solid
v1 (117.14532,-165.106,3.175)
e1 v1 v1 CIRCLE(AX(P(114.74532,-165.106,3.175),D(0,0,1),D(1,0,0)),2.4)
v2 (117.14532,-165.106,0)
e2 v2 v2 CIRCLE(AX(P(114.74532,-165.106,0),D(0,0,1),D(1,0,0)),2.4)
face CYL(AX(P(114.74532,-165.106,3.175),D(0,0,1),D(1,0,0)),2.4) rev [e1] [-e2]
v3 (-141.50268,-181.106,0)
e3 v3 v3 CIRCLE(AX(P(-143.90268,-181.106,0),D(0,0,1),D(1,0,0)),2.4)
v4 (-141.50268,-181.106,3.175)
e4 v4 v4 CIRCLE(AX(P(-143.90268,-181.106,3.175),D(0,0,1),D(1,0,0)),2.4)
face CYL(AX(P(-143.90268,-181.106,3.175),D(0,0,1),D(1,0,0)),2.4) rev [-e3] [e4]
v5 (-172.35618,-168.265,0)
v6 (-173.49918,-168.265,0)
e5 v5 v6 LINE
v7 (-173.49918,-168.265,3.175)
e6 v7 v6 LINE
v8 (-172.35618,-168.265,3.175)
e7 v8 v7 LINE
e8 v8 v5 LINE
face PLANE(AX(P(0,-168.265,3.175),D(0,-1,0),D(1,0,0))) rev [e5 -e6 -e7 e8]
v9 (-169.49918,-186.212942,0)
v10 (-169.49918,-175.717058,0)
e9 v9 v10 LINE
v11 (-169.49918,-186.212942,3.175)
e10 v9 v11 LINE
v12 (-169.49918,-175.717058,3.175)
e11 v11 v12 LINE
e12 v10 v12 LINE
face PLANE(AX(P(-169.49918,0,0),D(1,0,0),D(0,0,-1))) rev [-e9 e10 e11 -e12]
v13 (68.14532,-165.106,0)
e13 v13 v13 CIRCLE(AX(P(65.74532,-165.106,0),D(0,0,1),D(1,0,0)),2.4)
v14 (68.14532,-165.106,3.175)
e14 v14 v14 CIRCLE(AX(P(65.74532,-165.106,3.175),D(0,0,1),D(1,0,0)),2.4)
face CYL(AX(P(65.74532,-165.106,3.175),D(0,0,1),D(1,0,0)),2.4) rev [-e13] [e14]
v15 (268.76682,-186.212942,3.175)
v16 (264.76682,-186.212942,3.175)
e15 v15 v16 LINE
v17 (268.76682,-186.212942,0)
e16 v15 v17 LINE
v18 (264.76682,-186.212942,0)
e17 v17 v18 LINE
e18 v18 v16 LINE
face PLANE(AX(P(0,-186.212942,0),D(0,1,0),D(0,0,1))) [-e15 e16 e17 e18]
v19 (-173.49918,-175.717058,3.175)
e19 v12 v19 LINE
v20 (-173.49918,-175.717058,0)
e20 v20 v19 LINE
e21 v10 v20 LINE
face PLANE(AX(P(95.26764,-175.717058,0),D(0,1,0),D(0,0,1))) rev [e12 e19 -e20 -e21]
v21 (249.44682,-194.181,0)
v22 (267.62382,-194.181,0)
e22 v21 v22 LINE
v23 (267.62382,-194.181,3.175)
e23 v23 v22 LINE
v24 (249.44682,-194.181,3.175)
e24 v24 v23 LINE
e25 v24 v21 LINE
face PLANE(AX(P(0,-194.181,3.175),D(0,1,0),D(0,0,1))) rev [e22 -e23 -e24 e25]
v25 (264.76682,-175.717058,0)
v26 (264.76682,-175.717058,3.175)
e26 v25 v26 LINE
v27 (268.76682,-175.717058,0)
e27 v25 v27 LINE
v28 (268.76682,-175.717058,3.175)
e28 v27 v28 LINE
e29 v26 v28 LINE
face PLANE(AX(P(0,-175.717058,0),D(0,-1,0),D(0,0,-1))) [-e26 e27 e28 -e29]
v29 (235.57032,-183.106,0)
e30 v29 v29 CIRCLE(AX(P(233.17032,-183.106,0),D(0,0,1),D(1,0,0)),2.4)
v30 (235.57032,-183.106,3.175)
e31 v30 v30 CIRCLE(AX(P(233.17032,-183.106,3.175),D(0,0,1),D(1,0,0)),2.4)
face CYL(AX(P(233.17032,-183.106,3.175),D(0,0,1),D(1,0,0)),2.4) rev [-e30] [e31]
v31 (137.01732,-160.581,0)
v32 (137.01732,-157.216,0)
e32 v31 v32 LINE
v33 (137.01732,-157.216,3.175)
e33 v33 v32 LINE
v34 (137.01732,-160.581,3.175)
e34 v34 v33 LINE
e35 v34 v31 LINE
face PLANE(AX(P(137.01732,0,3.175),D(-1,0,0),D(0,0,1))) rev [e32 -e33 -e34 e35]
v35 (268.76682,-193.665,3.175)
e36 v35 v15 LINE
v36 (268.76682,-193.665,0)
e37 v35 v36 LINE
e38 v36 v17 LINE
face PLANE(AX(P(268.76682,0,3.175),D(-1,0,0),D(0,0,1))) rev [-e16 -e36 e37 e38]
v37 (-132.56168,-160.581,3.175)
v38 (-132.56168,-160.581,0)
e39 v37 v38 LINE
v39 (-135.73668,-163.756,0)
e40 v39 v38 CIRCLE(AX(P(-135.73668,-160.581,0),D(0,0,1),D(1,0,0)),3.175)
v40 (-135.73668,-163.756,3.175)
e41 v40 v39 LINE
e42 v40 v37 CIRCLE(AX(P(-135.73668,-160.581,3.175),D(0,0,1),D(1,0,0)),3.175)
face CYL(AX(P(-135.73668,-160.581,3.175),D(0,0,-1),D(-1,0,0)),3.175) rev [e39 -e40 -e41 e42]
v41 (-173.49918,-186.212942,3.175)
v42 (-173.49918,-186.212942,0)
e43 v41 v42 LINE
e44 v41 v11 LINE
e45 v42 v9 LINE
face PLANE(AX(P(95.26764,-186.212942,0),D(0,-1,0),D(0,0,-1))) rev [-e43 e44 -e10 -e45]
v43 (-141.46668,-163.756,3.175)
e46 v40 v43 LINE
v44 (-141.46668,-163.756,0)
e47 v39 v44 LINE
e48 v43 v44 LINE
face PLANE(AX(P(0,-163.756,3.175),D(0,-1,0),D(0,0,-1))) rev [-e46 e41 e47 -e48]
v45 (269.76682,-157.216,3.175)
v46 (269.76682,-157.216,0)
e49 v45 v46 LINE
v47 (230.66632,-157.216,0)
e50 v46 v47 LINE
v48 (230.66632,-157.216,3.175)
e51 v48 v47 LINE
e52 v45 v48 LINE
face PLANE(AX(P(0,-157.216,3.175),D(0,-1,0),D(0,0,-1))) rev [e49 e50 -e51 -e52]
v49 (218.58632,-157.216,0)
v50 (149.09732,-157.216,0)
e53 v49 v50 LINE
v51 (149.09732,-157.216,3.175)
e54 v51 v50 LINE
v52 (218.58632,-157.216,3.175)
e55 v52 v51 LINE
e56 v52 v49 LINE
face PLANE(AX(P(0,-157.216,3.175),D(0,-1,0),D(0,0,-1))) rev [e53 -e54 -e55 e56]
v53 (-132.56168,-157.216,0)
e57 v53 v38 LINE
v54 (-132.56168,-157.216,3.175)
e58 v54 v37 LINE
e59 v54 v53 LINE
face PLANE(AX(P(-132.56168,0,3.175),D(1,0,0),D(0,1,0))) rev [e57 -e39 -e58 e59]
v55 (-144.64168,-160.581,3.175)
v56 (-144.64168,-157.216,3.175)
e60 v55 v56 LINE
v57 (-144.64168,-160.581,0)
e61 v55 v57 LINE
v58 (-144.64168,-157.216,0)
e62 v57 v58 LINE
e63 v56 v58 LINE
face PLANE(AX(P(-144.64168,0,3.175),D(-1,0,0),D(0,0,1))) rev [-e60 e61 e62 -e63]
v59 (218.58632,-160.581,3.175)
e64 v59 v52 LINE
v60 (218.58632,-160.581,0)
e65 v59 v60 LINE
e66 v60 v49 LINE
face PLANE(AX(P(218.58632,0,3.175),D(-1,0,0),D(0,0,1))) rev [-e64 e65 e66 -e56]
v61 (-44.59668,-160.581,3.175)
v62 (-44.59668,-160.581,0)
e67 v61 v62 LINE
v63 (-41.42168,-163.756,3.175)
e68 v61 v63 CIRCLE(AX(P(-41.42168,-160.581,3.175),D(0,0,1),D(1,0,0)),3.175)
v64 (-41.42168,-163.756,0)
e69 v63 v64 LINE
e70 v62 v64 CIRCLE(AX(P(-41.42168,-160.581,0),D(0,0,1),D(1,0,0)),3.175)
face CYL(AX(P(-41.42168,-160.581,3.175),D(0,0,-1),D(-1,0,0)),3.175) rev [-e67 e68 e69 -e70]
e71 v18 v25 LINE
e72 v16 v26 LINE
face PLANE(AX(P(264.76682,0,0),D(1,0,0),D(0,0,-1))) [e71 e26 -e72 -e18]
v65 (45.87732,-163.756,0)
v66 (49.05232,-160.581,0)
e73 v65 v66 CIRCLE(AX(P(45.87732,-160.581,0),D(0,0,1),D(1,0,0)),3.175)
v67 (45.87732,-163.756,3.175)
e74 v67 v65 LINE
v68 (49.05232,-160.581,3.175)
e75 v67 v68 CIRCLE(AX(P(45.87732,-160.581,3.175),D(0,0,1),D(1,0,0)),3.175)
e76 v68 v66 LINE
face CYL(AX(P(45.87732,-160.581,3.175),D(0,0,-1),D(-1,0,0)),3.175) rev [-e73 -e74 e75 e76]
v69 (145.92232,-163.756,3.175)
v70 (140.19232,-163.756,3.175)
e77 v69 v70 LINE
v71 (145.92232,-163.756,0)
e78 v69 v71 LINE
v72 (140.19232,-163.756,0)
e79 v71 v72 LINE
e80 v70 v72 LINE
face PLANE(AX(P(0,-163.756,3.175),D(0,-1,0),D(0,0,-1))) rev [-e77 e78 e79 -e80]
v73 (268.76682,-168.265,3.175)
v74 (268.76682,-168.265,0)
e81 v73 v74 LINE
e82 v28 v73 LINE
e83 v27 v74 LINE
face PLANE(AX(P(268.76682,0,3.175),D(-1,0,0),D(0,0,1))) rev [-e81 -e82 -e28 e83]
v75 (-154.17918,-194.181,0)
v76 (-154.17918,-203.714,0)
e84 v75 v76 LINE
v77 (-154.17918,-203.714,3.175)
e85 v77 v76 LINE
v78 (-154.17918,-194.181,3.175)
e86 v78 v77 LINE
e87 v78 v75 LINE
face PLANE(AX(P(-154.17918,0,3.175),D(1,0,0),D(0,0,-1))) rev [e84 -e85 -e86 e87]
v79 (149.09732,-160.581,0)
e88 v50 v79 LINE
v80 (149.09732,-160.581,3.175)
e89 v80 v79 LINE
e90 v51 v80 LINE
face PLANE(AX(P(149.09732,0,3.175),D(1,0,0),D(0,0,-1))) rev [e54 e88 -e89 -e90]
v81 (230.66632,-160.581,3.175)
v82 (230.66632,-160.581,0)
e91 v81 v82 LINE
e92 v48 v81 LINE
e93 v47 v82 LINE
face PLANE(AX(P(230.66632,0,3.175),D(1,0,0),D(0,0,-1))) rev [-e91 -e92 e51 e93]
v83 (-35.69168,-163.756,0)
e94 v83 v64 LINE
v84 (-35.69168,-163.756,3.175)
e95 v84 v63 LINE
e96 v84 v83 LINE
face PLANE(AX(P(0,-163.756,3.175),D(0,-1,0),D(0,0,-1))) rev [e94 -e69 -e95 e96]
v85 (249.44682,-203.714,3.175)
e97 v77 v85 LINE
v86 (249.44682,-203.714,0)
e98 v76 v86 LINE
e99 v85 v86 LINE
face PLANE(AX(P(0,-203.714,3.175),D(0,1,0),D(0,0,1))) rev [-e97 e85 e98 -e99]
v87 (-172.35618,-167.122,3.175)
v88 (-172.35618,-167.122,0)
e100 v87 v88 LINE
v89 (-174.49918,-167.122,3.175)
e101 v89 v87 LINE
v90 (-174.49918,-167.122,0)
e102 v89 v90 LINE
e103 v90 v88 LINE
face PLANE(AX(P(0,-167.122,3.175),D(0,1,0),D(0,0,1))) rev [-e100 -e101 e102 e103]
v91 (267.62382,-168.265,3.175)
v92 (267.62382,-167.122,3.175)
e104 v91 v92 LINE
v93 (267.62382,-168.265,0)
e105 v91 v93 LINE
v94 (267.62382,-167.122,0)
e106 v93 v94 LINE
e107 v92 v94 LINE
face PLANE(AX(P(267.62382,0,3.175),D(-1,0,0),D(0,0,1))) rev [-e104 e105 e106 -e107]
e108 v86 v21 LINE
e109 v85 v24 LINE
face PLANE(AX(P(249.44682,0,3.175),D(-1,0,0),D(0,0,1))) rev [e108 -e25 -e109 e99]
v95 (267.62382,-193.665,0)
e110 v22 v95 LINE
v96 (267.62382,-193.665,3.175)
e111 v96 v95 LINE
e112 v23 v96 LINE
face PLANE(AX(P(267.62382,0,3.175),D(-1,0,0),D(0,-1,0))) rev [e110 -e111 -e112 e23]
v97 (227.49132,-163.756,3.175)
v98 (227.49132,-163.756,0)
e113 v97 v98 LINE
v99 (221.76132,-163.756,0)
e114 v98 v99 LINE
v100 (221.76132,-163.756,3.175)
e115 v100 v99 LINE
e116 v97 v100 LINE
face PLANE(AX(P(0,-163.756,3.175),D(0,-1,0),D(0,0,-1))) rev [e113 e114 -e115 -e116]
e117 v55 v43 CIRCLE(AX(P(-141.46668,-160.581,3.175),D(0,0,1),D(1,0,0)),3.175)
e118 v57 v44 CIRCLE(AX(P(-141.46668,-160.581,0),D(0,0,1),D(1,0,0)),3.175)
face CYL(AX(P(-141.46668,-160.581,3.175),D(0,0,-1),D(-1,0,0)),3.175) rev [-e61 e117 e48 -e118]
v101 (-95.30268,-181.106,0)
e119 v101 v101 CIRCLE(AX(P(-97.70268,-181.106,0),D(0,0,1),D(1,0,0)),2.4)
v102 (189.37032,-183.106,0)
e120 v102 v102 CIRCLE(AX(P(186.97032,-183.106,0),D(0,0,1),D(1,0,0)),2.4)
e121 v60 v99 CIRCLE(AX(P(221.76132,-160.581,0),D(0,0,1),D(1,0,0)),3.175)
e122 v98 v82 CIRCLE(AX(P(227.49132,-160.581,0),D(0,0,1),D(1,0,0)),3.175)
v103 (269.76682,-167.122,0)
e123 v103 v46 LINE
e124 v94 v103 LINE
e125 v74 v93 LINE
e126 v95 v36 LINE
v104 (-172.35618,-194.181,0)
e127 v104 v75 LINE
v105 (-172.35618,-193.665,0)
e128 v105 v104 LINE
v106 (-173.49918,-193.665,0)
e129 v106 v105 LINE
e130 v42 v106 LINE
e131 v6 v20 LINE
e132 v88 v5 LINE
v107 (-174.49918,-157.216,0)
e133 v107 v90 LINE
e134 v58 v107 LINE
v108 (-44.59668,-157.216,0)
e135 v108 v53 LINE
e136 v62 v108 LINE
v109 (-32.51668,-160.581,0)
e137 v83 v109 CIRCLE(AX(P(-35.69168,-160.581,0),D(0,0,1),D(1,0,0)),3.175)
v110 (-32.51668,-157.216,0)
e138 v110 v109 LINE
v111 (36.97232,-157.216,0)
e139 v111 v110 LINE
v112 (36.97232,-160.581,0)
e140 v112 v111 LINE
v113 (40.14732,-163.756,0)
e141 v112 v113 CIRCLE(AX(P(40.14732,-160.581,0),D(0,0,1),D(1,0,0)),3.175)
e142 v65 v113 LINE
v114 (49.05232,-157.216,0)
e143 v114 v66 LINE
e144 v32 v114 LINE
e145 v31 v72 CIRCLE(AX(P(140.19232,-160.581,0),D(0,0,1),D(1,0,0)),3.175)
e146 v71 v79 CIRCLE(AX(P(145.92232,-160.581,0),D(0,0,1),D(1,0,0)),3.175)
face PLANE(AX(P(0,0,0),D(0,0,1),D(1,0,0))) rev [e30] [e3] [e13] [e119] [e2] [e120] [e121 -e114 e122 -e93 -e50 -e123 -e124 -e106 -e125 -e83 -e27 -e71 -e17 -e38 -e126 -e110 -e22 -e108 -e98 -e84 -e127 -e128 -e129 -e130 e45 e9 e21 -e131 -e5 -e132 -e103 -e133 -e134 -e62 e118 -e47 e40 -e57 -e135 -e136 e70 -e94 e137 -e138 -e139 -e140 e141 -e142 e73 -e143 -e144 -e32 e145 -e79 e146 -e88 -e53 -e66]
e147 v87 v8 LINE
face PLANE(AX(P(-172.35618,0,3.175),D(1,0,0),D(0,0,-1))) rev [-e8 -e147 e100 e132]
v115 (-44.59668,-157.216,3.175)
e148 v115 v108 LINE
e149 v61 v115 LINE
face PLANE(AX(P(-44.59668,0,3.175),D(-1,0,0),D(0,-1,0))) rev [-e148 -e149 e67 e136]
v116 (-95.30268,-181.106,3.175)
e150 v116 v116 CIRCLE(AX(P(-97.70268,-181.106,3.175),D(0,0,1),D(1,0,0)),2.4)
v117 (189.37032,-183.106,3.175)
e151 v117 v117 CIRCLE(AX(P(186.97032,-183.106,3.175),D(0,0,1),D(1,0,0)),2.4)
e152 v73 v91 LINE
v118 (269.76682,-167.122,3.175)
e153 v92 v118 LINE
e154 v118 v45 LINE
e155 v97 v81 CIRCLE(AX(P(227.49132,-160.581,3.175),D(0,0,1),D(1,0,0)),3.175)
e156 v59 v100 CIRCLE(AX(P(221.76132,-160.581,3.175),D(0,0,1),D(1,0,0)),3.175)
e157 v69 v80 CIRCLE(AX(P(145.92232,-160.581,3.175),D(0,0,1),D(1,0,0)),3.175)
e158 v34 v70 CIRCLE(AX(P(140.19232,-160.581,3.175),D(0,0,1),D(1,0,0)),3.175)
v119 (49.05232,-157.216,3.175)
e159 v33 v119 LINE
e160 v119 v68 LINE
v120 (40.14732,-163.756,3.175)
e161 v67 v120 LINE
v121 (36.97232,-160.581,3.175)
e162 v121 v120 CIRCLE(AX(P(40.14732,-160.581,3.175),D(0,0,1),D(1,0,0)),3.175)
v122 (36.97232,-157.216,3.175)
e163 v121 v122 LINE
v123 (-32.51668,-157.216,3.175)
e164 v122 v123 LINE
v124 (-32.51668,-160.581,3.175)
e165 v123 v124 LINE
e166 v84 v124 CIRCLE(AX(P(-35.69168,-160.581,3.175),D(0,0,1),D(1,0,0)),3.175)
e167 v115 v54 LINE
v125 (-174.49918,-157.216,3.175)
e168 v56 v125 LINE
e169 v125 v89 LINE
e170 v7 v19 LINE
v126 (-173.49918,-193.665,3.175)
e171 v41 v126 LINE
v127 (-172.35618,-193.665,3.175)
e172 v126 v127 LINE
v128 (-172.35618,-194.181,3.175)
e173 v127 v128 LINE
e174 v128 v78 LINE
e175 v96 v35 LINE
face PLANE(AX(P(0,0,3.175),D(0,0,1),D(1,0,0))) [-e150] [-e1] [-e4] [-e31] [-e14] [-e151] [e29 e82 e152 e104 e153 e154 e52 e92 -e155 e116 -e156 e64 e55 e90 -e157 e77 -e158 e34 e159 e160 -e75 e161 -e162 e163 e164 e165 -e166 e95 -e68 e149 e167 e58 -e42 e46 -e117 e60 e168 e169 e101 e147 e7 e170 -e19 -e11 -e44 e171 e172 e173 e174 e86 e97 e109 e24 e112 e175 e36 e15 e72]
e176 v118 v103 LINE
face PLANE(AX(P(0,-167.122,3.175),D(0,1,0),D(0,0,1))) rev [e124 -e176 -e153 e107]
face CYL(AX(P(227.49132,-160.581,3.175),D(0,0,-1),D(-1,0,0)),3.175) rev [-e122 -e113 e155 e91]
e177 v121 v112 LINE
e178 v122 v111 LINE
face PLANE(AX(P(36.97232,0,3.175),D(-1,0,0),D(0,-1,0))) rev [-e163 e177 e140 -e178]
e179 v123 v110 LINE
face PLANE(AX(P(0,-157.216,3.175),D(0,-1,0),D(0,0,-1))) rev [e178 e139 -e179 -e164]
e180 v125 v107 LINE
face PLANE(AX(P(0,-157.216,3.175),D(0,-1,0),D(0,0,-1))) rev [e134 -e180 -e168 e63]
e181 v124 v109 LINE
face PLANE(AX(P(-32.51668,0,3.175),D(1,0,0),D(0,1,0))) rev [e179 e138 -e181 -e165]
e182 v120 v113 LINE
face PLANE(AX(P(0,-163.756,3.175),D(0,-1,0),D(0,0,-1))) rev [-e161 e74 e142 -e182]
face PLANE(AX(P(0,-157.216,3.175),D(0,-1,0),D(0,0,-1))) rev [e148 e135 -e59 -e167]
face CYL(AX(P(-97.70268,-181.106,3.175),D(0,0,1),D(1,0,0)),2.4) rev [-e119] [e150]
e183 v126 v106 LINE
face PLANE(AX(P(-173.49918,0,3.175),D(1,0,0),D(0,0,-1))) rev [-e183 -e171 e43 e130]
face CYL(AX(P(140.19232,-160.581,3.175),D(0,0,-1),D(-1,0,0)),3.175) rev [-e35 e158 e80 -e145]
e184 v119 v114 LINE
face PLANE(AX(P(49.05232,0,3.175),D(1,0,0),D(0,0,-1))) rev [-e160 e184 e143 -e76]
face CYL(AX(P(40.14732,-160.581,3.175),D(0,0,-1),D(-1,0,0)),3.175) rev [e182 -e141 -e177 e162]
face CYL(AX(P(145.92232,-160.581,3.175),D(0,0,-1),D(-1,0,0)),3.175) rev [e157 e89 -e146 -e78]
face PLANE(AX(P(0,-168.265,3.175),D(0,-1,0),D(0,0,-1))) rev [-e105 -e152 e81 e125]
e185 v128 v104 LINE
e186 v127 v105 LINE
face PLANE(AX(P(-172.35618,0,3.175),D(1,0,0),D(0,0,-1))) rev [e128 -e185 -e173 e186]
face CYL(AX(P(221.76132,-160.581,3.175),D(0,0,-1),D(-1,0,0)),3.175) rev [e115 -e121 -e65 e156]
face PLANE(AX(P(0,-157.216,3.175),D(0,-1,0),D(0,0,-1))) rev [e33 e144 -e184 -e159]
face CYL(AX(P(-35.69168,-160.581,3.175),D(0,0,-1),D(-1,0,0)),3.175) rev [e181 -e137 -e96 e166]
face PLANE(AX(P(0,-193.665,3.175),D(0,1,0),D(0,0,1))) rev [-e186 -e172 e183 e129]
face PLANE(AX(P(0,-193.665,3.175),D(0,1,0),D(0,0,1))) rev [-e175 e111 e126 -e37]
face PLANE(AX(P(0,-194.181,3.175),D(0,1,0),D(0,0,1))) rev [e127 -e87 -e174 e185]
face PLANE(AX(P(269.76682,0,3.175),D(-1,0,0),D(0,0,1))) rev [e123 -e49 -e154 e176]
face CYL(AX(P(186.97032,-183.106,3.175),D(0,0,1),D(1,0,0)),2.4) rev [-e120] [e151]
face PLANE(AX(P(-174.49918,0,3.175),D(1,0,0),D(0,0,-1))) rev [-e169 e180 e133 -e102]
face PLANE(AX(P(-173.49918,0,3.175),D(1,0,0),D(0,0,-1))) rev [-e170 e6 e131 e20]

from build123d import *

# Parameters (mm, degrees)
BOSS_EXTRUDE1_DEPTH          = 3.175
M4_CLEARANCE_HOLE1_OUTLINE_R = 2.4
M4_CLEARANCE_HOLE1_DEPTH     = 3.175
CUT_EXTRUDE1_DEPTH           = 3.175


# Read off the part's stored shape, not the designer's step: M4 Clearance Hole1
with BuildPart() as part:
    # Sketch2 → Boss-Extrude1 (new body)
    with BuildSketch(Plane.XY):
        with BuildLine():
            Line((227.491320086, -163.756000107), (221.761320086, -163.756000107))
            ThreePointArc((221.761320086, -163.756000107), (219.516256056, -162.826064137), (218.586320086, -160.581000107))
            Line((218.586320086, -160.581000107), (218.586320086, -157.216000107))
            Line((218.586320086, -157.216000107), (149.097320094, -157.216000107))
            Line((149.097320094, -157.216000107), (149.097320094, -160.581000107))
            ThreePointArc((149.097320094, -160.581000107), (148.167384125, -162.826064137), (145.922320094, -163.756000107))
            Line((145.922320094, -163.756000107), (140.192320094, -163.756000107))
            ThreePointArc((140.192320094, -163.756000107), (137.947256064, -162.826064137), (137.017320094, -160.581000107))
            Line((137.017320094, -160.581000107), (137.017320094, -157.216000107))
            Line((137.017320094, -157.216000107), (49.052320094, -157.216000107))
            Line((49.052320094, -157.216000107), (49.052320094, -160.581000107))
            ThreePointArc((49.052320094, -160.581000107), (48.122384125, -162.826064137), (45.877320094, -163.756000107))
            Line((45.877320094, -163.756000107), (40.147320094, -163.756000107))
            ThreePointArc((40.147320094, -163.756000107), (37.902256064, -162.826064137), (36.972320094, -160.581000107))
            Line((36.972320094, -160.581000107), (36.972320094, -157.216000107))
            Line((36.972320094, -157.216000107), (-32.516679898, -157.216000107))
            Line((-32.516679898, -157.216000107), (-32.516679898, -160.581000107))
            ThreePointArc((-32.516679898, -160.581000107), (-33.446615867, -162.826064137), (-35.691679898, -163.756000107))
            Line((-35.691679898, -163.756000107), (-41.421679898, -163.756000107))
            ThreePointArc((-41.421679898, -163.756000107), (-43.666743928, -162.826064137), (-44.596679898, -160.581000107))
            Line((-44.596679898, -160.581000107), (-44.596679898, -157.216000107))
            Line((-44.596679898, -157.216000107), (-132.561679898, -157.216000107))
            Line((-132.561679898, -157.216000107), (-132.561679898, -160.581000107))
            ThreePointArc((-132.561679898, -160.581000107), (-133.491615867, -162.826064137), (-135.736679898, -163.756000107))
            Line((-135.736679898, -163.756000107), (-141.466679898, -163.756000107))
            ThreePointArc((-141.466679898, -163.756000107), (-143.711743928, -162.826064137), (-144.641679898, -160.581000107))
            Line((-144.641679898, -160.581000107), (-144.641679898, -157.216000107))
            Line((-144.641679898, -157.216000107), (-174.499179878, -157.216000107))
            Line((-174.499179878, -157.216000107), (-174.499179878, -167.122000107))
            Line((-174.499179878, -167.122000107), (-172.356179878, -167.122000107))
            Line((-172.356179878, -167.122000107), (-172.356179878, -168.265000107))
            Line((-172.356179878, -168.265000107), (-173.499179878, -168.265000107))
            Line((-173.499179878, -168.265000107), (-173.499179878, -193.665000107))
            Line((-173.499179878, -193.665000107), (-172.356179878, -193.665000107))
            Line((-172.356179878, -193.665000107), (-172.356179878, -194.181000107))
            Line((-172.356179878, -194.181000107), (-154.179179878, -194.181000107))
            Line((-154.179179878, -194.181000107), (-154.179179878, -203.714000107))
            Line((-154.179179878, -203.714000107), (249.446820082, -203.714000107))
            Line((249.446820082, -203.714000107), (249.446820082, -194.181000107))
            Line((249.446820082, -194.181000107), (267.623820082, -194.181000107))
            Line((267.623820082, -194.181000107), (267.623820082, -193.665000107))
            Line((267.623820082, -193.665000107), (268.766820082, -193.665000107))
            Line((268.766820082, -193.665000107), (268.766820082, -168.265000107))
            Line((268.766820082, -168.265000107), (267.623820082, -168.265000107))
            Line((267.623820082, -168.265000107), (267.623820082, -167.122000107))
            Line((267.623820082, -167.122000107), (269.766820082, -167.122000107))
            Line((269.766820082, -167.122000107), (269.766820082, -157.216000107))
            Line((269.766820082, -157.216000107), (230.666320086, -157.216000107))
            Line((230.666320086, -157.216000107), (230.666320086, -160.581000107))
            ThreePointArc((230.666320086, -160.581000107), (229.736384117, -162.826064137), (227.491320086, -163.756000107))
        make_face()
    extrude(amount=BOSS_EXTRUDE1_DEPTH)

    # M4 Clearance Hole1 outline → M4 Clearance Hole1 (cut)
    with BuildSketch(Plane.XY):
        with Locations((233.170320102, -183.106000107)):
            Circle(M4_CLEARANCE_HOLE1_OUTLINE_R)
        with Locations((186.970320102, -183.106000107)):
            Circle(M4_CLEARANCE_HOLE1_OUTLINE_R)
        with Locations((114.745320102, -165.106000107)):
            Circle(M4_CLEARANCE_HOLE1_OUTLINE_R)
        with Locations((65.745320102, -165.106000107)):
            Circle(M4_CLEARANCE_HOLE1_OUTLINE_R)
        with Locations((-97.702679898, -181.106000107)):
            Circle(M4_CLEARANCE_HOLE1_OUTLINE_R)
        with Locations((-143.902679898, -181.106000107)):
            Circle(M4_CLEARANCE_HOLE1_OUTLINE_R)
    extrude(amount=M4_CLEARANCE_HOLE1_DEPTH, mode=Mode.SUBTRACT)

    # Sketch5 → Cut-Extrude1 (cut)
    with BuildSketch(Plane.XY.offset(3.175)):
        Polygon((264.766820082, -175.717058259), (268.766820082, -175.717058259), (268.766820082, -176.460000107), (266.515167585, -176.460000107), (264.766820082, -176.928468408), align=None)
        with BuildLine():
            Line((271.531820082, -185.652747691), (271.531820082, -186.212941955))
            Line((271.531820082, -186.212941955), (268.766820082, -186.212941955))
            Line((268.766820082, -186.212941955), (268.766820082, -185.470000107))
            Line((268.766820082, -185.470000107), (266.515167585, -185.470000107))
            Line((266.515167585, -185.470000107), (264.766820082, -185.001531806))
            Line((264.766820082, -185.001531806), (264.766820082, -176.928468408))
            Line((264.766820082, -176.928468408), (266.515167585, -176.460000107))
            Line((266.515167585, -176.460000107), (268.766820082, -176.460000107))
            Line((268.766820082, -176.460000107), (268.766820082, -175.717058259))
            Line((268.766820082, -175.717058259), (271.531820082, -175.717058259))
            Line((271.531820082, -175.717058259), (271.531820082, -176.277252523))
            ThreePointArc((271.531820082, -176.277252523), (272.085217516, -176.676347658), (272.296820082, -177.325000107))
            Line((272.296820082, -177.325000107), (272.296820082, -184.605000107))
            ThreePointArc((272.296820082, -184.605000107), (272.085217516, -185.253652556), (271.531820082, -185.652747691))
        make_face()
        Polygon((264.766820082, -185.001531806), (264.766820082, -186.212941955), (268.766820082, -186.212941955), (268.766820082, -185.470000107), (266.515167585, -185.470000107), align=None)
    cut_extrude1 = extrude(amount=-CUT_EXTRUDE1_DEPTH, mode=Mode.SUBTRACT)

    # Mirror1: Cut-Extrude1 across plane
    add(cut_extrude1.mirror(Plane(origin=(47.633820102, 0, 0), x_dir=(0, 0, 1), z_dir=(1, 0, 0))), mode=Mode.SUBTRACT)


solid = part.part
